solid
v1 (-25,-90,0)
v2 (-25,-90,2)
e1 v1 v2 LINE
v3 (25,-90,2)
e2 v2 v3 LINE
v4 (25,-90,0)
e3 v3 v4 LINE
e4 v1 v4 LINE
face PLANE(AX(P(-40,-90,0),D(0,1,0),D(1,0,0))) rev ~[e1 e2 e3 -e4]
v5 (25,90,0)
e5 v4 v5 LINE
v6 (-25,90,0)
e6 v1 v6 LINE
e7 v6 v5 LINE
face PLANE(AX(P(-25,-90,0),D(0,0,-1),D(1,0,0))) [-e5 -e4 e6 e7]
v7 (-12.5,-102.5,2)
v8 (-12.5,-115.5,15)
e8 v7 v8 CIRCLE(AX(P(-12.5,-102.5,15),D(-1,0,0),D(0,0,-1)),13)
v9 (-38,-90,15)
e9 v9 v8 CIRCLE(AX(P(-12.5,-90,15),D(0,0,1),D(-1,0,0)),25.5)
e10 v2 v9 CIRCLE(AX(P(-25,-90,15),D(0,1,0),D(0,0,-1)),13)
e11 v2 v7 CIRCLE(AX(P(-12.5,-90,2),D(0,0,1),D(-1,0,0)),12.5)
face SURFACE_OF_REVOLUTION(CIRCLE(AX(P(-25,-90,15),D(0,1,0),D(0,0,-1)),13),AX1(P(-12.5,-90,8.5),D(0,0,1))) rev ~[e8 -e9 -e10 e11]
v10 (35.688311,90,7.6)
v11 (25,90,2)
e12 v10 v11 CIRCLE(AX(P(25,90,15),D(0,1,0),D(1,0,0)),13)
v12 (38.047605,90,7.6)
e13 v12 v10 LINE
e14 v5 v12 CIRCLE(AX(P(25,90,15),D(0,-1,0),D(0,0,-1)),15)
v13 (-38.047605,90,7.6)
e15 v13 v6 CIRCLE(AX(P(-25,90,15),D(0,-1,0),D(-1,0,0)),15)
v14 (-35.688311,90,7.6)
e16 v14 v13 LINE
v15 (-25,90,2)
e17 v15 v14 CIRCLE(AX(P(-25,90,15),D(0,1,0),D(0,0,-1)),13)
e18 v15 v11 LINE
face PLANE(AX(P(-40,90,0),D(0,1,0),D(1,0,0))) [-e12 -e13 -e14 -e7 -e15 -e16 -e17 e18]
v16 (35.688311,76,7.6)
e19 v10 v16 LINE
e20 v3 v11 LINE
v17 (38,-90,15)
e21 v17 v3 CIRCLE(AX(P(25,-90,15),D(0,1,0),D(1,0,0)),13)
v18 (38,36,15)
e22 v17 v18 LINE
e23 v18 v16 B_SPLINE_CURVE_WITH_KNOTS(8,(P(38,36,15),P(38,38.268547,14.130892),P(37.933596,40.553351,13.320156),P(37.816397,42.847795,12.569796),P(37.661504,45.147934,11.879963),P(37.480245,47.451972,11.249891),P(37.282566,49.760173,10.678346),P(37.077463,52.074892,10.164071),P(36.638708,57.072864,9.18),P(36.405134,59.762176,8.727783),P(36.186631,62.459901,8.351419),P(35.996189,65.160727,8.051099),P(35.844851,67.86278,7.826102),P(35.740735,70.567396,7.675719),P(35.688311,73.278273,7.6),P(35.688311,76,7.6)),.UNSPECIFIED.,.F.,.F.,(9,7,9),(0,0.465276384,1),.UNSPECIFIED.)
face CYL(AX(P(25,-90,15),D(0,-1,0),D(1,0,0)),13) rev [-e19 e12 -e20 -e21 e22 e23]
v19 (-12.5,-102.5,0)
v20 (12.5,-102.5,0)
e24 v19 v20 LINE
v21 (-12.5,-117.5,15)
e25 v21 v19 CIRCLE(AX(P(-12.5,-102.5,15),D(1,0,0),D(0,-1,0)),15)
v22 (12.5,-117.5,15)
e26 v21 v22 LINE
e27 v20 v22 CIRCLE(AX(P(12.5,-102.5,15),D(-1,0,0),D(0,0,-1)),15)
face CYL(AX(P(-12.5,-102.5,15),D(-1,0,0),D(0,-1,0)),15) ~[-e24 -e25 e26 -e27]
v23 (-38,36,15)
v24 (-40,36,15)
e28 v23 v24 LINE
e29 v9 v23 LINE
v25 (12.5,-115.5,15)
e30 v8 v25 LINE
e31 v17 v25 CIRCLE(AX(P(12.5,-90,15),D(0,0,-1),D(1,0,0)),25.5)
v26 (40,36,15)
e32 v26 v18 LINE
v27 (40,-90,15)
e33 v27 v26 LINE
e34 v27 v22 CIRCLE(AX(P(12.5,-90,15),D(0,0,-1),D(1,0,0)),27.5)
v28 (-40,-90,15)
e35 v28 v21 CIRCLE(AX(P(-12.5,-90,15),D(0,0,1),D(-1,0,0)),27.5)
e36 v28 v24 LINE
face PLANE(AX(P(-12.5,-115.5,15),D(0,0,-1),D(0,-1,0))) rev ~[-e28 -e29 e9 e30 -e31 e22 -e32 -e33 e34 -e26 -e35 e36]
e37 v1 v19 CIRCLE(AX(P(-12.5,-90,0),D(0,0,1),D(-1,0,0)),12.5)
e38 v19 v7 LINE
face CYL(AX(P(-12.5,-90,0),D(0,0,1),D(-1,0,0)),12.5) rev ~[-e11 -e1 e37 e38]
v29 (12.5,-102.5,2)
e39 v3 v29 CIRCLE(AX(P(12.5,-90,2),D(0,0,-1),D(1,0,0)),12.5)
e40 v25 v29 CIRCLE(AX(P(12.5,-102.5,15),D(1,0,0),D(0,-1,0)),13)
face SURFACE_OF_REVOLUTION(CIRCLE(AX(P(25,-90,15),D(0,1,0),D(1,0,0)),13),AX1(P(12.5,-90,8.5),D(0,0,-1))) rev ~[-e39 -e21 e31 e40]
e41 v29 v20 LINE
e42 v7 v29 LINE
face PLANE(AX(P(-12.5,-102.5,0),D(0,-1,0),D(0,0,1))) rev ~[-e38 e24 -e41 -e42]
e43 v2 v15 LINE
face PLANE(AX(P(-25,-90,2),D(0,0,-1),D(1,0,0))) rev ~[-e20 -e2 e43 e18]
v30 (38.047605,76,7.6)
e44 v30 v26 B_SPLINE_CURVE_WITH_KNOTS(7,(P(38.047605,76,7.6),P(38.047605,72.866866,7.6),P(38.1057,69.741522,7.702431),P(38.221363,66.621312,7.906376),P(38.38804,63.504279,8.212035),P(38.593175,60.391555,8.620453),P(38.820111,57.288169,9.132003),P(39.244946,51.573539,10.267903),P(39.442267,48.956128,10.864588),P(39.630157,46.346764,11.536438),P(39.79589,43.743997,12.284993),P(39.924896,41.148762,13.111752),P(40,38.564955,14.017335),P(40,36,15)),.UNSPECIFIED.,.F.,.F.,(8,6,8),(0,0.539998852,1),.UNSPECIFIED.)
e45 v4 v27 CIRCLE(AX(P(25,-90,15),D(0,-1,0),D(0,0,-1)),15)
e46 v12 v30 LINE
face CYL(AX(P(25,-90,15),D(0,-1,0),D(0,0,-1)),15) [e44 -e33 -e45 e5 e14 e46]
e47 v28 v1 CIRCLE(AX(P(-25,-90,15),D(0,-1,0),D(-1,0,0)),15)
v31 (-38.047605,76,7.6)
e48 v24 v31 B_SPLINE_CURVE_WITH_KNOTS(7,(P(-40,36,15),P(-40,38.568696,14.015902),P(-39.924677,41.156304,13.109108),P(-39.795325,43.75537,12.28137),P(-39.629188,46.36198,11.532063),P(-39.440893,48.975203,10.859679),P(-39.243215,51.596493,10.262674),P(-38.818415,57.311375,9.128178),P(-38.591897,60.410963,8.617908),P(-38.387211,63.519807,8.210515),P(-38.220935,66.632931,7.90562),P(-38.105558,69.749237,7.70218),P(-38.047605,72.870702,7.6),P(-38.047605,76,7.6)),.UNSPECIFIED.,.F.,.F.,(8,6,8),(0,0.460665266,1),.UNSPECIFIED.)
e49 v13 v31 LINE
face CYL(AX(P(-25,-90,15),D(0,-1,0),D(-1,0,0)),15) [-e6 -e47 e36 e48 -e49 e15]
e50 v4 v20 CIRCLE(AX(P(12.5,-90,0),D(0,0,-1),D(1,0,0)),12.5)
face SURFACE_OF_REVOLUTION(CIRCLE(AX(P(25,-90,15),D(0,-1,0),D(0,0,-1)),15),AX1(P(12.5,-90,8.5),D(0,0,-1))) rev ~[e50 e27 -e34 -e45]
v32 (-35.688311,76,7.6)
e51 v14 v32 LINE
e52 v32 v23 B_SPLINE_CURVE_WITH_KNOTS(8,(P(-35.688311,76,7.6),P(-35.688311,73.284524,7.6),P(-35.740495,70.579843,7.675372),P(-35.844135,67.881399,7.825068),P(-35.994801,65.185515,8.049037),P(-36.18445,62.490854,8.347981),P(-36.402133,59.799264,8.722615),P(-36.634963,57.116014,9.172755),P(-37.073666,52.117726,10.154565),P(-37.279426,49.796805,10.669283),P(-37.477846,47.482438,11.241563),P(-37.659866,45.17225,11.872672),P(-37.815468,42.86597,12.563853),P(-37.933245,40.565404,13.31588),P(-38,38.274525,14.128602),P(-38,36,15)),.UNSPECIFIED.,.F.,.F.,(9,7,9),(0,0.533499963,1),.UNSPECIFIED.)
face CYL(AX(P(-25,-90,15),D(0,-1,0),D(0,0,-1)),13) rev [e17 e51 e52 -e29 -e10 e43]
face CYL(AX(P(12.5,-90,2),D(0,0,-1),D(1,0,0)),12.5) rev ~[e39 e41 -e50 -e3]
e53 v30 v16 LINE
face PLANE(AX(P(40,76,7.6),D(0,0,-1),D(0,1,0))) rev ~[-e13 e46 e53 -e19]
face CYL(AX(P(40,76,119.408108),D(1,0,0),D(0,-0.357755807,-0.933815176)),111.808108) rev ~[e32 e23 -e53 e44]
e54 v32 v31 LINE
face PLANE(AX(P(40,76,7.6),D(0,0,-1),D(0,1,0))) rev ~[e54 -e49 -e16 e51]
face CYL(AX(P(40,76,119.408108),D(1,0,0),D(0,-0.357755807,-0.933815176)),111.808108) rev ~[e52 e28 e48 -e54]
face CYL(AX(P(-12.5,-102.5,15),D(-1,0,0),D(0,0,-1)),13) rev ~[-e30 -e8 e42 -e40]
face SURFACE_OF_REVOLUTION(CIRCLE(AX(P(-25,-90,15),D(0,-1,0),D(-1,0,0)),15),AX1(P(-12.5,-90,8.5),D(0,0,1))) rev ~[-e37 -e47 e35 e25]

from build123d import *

# Parameters (mm, degrees)
F0_W     = 80
F0_H     = 180
F1_DEPTH = 15
F2_W     = 50
F2_H     = 2
F3_DEPTH = 180
F4_ANGLE = 90
F5_ANGLE = 90
F6_DEPTH = 25
F9_DEPTH = 80.001


with BuildPart() as f1:
    # F0 (on Top) → F1 (new body)
    with BuildSketch(Plane.XY):
        Rectangle(F0_W, F0_H)
    extrude(amount=F1_DEPTH)

    # F2 (on face) → F3 (intersect, through all)
    with BuildSketch(Plane.XZ.offset(90)):
        with BuildLine():
            Line((-38, 15), (-40, 15))
            ThreePointArc((-40, 15), (-35.6066017178, 4.3933982822), (-25, 0))
            Line((-25, 0), (-25, 2))
            ThreePointArc((-25, 2), (-34.1923881554, 5.8076118446), (-38, 15))
        make_face()
        with Locations((0, 1)):
            Rectangle(F2_W, F2_H)
        with BuildLine():
            Line((25, 2), (25, 0))
            ThreePointArc((25, 0), (35.6066017178, 4.3933982822), (40, 15))
            Line((40, 15), (38, 15))
            ThreePointArc((38, 15), (34.1923881554, 5.8076118446), (25, 2))
        make_face()
    extrude(amount=-F3_DEPTH, mode=Mode.INTERSECT)

    # F2 (on face) → F4 (revolve)
    with BuildSketch(Plane.XZ.offset(90)):
        with BuildLine():
            Line((25, 2), (25, 0))
            ThreePointArc((25, 0), (35.6066017178, 4.3933982822), (40, 15))
            Line((40, 15), (38, 15))
            ThreePointArc((38, 15), (34.1923881554, 5.8076118446), (25, 2))
        make_face()
    revolve(axis=Axis((12.5, -90, 8.5), (0, 0, -1)), revolution_arc=F4_ANGLE)

    # F2 (on face) → F5 (revolve)
    with BuildSketch(Plane.XZ.offset(90)):
        with BuildLine():
            Line((-38, 15), (-40, 15))
            ThreePointArc((-40, 15), (-35.6066017178, 4.3933982822), (-25, 0))
            Line((-25, 0), (-25, 2))
            ThreePointArc((-25, 2), (-34.1923881554, 5.8076118446), (-38, 15))
        make_face()
    revolve(axis=Axis((-12.5, -90, 8.5), (0, 0, 1)), revolution_arc=F5_ANGLE)

    # F6 (add, through all): a face of the model
    f6_faces = [f1.faces().sort_by_distance(p)[0] for p in [
        (-12.5, -111.8423881554, 5.6576118446),
    ]]
    extrude(f6_faces, amount=F6_DEPTH)

    # F8 (on face) → F9 (cut, through all)
    with BuildSketch(Plane.YZ.offset(40)):
        with BuildLine():
            Line((90, 7.6), (90, 15))
            Line((90, 15), (36, 15))
            ThreePointArc((36, 15), (55.6606293116, 9.4655638465), (76, 7.6))
            Line((76, 7.6), (90, 7.6))
        make_face()
    extrude(amount=-F9_DEPTH, mode=Mode.SUBTRACT)


solid = f1.part
